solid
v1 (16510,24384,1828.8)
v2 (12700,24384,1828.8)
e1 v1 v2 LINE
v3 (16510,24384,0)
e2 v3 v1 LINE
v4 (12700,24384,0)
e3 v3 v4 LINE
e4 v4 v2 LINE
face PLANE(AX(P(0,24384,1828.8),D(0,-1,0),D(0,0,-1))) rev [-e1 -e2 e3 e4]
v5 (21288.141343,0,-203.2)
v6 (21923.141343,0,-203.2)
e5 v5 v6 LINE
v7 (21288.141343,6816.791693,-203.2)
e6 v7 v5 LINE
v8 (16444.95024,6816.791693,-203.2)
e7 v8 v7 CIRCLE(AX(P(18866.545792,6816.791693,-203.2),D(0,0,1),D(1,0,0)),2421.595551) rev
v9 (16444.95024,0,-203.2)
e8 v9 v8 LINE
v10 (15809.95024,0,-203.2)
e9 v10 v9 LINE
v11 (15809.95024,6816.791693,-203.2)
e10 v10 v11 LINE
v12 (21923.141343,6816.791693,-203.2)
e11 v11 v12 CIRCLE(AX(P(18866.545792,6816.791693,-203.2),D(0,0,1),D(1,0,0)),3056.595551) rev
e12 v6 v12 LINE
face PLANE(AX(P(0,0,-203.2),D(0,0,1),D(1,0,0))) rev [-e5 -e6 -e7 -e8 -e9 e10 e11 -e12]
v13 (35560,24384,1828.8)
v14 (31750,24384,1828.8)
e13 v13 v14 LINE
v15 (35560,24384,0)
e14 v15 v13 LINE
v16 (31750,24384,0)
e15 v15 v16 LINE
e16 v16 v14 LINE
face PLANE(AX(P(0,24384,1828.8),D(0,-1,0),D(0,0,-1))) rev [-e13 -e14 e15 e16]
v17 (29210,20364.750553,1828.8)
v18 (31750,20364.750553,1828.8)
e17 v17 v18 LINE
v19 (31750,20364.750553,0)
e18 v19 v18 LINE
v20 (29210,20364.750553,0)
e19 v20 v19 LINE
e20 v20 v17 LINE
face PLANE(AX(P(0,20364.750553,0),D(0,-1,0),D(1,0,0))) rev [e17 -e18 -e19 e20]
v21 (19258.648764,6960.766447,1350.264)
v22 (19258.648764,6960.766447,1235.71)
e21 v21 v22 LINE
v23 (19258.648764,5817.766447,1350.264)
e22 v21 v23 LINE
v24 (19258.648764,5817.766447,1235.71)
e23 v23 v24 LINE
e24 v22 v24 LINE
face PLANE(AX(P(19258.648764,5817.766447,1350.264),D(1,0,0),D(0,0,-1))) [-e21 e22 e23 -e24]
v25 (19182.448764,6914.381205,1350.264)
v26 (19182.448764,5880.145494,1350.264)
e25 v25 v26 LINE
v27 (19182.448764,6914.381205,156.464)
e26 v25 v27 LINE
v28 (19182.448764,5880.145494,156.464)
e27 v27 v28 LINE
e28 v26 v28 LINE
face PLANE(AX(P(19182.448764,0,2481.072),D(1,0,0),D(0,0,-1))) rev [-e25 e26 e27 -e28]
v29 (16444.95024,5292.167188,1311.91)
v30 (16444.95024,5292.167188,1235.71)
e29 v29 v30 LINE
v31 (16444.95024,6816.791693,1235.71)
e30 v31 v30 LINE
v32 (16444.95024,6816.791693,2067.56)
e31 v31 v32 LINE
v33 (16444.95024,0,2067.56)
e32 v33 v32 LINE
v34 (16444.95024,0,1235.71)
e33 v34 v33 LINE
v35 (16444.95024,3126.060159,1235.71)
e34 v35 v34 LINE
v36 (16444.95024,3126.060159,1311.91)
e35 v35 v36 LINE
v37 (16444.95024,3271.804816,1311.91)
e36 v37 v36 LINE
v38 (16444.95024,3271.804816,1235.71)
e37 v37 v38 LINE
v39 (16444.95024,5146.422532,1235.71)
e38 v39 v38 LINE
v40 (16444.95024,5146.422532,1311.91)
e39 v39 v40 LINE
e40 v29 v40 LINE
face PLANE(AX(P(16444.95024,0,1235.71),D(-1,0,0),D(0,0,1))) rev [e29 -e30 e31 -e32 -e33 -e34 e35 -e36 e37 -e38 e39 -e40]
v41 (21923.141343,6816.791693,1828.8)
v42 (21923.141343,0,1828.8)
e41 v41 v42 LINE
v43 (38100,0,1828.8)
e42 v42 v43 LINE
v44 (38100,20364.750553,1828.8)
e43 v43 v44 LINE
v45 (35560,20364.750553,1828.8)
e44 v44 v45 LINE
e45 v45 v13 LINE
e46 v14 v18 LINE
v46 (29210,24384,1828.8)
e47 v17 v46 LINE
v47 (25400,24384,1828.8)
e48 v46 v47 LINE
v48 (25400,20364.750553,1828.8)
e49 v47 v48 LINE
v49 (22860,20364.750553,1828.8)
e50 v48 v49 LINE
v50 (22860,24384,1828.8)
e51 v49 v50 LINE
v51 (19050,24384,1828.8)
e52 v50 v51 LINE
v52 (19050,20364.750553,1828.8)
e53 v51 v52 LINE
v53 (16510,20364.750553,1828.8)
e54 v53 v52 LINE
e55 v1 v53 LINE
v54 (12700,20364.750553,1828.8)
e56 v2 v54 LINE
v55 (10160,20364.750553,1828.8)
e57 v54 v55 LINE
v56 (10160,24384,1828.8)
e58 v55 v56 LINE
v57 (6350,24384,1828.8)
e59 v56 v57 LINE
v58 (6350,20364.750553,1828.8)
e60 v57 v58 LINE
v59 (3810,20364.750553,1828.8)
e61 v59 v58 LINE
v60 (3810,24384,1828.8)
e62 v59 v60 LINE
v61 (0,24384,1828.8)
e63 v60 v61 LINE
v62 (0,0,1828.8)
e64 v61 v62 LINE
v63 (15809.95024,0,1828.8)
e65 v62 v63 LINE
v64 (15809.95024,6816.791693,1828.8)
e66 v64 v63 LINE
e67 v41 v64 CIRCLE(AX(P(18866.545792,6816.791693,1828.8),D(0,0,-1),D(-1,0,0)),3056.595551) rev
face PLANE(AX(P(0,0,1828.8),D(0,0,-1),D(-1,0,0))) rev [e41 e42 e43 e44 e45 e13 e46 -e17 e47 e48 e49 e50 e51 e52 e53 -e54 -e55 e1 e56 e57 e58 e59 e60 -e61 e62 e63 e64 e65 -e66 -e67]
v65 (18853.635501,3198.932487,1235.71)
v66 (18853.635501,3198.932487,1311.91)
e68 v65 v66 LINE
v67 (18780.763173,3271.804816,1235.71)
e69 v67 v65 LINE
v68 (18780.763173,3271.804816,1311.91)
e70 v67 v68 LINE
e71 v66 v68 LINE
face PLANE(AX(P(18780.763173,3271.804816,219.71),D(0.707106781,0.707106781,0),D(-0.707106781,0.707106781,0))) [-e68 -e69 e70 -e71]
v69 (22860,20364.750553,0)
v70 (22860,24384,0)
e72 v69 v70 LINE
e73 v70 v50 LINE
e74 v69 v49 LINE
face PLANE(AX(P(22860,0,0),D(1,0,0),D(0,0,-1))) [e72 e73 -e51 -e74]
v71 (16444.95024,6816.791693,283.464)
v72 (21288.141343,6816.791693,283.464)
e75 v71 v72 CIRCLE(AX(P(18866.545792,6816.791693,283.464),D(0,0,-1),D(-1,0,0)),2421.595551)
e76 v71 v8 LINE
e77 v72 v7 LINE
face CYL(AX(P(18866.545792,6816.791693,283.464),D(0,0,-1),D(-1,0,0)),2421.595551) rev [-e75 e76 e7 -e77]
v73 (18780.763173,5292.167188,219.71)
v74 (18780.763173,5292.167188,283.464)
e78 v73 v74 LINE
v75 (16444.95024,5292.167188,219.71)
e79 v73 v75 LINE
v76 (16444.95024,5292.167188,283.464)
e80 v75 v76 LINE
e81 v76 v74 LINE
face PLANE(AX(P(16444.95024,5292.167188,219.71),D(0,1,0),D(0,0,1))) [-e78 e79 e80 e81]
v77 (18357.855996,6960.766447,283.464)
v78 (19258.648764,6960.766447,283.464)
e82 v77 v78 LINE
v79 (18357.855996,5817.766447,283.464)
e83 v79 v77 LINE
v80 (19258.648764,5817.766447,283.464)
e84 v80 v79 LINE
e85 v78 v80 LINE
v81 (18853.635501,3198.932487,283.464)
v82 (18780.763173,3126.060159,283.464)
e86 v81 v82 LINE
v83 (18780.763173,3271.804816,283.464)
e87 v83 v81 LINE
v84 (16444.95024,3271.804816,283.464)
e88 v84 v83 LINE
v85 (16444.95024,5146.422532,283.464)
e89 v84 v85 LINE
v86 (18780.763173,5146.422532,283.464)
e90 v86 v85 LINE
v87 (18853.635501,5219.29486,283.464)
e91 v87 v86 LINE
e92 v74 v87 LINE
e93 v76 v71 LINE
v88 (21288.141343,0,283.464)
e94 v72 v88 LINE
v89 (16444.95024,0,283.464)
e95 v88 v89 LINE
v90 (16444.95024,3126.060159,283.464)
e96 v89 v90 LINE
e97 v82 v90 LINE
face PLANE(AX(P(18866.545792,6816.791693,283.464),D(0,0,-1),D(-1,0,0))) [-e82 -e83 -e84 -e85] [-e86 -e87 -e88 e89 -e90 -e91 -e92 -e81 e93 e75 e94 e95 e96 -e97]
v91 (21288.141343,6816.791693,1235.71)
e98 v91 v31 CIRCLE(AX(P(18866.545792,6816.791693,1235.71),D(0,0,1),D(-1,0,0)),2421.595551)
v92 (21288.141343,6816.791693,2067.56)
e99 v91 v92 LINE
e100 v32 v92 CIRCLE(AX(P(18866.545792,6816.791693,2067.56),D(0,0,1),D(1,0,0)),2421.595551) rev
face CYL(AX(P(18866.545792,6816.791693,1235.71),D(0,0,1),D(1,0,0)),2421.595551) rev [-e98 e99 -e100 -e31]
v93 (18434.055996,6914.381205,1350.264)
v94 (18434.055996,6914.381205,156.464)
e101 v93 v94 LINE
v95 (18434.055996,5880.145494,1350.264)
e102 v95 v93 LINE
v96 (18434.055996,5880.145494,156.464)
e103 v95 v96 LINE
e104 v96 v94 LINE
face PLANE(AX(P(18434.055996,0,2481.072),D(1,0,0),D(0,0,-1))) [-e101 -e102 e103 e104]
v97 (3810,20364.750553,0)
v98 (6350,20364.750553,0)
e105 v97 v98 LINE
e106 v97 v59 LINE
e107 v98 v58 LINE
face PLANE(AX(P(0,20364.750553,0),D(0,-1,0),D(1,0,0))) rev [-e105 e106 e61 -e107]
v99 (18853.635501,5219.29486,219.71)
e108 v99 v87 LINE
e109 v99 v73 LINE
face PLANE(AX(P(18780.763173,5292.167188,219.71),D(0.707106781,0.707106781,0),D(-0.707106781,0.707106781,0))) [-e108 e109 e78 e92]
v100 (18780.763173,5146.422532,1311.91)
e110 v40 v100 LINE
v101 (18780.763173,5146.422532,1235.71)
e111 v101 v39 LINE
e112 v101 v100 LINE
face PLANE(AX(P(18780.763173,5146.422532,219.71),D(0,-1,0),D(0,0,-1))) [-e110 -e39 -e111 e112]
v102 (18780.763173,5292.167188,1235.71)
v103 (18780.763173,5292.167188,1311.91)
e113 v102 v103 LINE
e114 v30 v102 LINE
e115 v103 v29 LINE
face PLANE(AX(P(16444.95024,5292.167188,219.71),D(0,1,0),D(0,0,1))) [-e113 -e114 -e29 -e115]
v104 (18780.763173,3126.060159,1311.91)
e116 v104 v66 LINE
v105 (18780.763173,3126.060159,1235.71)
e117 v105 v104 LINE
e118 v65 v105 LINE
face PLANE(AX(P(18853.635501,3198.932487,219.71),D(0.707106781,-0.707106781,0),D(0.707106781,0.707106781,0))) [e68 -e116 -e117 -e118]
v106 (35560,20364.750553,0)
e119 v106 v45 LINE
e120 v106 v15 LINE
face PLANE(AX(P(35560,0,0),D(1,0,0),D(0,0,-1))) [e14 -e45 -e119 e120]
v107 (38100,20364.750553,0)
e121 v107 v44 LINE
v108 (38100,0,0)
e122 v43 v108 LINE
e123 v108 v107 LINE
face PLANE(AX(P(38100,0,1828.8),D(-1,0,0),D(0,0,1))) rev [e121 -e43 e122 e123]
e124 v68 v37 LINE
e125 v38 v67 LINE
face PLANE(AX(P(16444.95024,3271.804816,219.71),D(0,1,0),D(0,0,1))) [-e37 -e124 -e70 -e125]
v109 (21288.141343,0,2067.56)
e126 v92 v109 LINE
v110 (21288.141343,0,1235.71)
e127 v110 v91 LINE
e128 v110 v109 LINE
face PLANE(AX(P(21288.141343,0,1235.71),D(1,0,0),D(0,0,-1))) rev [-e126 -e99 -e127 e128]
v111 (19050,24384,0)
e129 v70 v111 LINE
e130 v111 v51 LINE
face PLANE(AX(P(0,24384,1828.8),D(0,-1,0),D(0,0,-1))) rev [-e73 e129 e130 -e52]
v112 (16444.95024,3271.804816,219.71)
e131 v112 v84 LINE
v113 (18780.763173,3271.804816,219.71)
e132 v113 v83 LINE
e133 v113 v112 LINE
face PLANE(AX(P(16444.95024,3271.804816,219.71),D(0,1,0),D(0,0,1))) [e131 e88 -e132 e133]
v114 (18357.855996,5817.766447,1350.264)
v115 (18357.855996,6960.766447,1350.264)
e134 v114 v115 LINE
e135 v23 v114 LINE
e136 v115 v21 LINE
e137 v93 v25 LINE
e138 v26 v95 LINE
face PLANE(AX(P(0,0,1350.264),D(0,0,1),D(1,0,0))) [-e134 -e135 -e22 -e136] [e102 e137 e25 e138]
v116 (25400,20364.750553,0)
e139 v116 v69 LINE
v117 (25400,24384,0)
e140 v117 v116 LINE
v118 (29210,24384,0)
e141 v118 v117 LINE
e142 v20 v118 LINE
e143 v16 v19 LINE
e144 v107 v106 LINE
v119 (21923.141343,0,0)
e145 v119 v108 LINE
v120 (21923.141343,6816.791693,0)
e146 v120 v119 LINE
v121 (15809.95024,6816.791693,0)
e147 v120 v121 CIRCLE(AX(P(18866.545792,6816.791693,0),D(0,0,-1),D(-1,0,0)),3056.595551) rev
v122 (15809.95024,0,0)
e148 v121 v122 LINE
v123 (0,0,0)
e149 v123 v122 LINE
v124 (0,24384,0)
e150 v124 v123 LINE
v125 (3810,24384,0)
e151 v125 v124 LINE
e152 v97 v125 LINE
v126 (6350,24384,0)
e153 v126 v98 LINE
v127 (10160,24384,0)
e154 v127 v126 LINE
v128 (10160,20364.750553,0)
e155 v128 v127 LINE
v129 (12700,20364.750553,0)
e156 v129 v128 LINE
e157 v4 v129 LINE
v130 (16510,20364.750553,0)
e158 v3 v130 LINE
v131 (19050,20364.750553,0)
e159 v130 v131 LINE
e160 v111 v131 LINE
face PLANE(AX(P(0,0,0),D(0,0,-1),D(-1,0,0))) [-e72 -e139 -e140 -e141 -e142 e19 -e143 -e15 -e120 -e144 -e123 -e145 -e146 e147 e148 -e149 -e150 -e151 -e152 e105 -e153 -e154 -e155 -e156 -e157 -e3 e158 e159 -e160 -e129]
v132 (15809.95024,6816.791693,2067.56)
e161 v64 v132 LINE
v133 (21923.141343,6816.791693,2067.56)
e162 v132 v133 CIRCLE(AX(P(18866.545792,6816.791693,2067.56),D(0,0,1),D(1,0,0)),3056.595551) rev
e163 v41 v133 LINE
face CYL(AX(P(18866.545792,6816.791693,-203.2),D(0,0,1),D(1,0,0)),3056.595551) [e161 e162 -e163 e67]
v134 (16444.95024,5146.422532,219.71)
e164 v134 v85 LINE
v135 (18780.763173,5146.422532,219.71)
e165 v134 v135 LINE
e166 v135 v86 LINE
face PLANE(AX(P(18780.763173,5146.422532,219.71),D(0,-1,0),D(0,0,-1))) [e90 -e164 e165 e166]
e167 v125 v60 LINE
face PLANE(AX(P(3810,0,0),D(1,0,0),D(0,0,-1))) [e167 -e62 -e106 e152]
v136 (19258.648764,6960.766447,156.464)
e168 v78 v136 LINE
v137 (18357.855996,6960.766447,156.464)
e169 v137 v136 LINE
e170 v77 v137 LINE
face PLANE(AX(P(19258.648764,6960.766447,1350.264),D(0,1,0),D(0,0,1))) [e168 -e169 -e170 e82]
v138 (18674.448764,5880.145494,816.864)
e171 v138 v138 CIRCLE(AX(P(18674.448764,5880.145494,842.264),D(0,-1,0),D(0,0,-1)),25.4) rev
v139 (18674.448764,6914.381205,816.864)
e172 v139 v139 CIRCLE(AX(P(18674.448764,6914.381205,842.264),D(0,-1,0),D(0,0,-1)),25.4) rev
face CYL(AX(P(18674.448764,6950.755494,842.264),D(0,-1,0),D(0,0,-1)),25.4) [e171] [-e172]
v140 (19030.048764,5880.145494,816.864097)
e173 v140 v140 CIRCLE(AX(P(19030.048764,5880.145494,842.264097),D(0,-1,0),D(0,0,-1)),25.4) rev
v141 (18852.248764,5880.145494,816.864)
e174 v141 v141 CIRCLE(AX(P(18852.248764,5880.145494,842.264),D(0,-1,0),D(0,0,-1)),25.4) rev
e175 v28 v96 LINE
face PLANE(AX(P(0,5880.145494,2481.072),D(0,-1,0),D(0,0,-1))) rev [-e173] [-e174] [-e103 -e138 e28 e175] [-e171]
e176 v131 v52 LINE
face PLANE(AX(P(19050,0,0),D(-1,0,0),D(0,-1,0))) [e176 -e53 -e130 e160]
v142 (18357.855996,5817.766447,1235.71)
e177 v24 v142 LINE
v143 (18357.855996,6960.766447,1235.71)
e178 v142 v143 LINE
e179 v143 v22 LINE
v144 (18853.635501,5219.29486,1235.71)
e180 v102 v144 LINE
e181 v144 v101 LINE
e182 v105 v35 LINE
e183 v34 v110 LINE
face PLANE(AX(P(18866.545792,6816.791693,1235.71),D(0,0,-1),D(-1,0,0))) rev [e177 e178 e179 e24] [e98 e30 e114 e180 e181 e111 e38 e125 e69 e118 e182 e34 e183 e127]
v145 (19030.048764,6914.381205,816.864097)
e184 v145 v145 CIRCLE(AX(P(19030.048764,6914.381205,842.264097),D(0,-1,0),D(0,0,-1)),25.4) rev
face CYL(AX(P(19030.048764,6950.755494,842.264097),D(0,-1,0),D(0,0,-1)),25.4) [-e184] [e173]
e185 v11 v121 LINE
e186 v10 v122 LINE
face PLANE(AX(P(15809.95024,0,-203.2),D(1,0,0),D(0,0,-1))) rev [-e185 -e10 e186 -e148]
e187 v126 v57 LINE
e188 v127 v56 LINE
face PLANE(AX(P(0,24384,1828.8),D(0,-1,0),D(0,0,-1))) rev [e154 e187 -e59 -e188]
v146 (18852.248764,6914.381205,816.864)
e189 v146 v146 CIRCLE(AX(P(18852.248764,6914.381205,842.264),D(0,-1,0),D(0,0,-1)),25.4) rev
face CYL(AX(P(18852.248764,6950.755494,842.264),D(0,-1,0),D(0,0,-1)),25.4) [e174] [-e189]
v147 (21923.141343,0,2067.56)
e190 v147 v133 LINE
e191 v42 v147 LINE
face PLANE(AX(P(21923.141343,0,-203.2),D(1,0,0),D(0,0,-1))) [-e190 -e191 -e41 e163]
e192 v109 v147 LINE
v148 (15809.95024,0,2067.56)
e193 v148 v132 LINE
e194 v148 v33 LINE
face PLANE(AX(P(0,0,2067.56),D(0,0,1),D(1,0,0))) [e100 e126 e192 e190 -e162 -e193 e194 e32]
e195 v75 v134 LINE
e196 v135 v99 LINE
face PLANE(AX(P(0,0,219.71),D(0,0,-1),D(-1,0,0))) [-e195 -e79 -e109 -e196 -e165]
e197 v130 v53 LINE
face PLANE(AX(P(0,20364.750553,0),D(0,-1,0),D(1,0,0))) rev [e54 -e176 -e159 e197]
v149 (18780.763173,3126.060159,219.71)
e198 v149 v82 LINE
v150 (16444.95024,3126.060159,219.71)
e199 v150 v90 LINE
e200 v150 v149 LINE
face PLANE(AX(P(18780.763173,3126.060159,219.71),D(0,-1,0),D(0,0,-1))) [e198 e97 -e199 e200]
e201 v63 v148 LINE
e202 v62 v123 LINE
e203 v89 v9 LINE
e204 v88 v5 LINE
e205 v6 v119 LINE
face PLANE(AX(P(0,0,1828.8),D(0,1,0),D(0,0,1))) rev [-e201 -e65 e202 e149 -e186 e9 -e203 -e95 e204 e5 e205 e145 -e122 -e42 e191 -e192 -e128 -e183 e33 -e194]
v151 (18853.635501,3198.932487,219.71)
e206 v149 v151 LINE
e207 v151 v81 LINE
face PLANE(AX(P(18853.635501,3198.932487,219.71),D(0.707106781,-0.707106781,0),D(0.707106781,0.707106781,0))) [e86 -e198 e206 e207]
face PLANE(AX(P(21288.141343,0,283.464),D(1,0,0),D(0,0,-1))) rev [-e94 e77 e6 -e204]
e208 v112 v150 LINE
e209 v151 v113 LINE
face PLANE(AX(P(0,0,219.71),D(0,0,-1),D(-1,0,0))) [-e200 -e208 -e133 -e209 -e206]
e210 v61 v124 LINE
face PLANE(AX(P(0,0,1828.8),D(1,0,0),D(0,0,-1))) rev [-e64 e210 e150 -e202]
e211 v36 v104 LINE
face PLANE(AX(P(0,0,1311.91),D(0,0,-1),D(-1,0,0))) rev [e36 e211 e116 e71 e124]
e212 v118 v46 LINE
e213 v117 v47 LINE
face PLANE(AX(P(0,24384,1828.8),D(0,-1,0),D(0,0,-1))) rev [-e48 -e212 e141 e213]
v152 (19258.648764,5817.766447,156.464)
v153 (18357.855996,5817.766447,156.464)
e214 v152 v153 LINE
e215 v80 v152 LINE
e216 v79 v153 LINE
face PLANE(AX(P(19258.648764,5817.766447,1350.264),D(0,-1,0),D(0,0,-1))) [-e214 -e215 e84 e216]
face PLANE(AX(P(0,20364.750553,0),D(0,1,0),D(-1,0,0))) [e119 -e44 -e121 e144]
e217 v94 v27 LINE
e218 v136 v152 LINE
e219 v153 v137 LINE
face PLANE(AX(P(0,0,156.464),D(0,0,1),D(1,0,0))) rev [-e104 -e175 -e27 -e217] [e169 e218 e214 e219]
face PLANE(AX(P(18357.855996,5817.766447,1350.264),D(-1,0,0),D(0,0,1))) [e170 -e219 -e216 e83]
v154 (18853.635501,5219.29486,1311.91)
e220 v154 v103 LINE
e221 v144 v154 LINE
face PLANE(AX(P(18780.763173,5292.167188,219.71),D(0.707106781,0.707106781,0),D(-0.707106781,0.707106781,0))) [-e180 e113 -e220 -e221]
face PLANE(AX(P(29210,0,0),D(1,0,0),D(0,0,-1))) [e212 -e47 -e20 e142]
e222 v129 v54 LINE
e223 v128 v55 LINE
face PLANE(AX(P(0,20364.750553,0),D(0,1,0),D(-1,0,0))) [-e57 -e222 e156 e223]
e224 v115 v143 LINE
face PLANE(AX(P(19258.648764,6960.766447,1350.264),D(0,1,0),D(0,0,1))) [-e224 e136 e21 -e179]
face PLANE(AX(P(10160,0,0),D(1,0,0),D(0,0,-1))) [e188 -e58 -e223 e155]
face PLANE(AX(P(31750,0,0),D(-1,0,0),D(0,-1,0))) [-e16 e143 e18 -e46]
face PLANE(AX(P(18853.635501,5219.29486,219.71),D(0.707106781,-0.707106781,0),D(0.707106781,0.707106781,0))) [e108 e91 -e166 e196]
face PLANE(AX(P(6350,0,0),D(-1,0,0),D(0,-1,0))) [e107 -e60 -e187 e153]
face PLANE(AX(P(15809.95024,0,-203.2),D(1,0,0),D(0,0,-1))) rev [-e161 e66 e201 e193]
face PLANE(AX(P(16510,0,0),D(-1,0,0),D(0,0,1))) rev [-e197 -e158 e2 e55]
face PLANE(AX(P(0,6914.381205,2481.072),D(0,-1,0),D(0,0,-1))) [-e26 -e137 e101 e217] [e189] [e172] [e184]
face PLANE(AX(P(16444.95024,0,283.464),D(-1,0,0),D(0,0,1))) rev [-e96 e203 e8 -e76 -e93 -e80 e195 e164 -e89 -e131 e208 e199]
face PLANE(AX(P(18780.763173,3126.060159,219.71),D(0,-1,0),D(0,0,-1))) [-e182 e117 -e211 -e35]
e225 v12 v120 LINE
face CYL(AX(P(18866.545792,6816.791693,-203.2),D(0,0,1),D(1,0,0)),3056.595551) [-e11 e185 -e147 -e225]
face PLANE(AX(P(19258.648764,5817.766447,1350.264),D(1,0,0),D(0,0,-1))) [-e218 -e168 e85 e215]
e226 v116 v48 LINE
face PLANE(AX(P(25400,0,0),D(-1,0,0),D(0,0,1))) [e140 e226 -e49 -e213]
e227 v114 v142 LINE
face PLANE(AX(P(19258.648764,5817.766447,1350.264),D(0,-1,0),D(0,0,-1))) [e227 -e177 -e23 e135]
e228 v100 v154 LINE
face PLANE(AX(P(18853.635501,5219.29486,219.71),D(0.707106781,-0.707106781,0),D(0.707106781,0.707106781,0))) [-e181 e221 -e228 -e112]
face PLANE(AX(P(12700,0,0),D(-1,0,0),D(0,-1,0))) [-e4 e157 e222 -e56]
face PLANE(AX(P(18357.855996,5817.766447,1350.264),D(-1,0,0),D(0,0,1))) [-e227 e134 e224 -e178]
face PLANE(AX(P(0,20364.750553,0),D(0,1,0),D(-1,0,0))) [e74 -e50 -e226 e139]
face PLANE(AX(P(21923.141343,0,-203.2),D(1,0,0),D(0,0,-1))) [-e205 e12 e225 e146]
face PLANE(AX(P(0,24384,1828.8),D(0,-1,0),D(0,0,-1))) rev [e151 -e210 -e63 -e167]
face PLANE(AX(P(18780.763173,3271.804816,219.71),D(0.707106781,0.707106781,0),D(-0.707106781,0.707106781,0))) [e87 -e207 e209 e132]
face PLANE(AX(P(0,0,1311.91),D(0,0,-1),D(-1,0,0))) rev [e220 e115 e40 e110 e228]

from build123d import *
from build123d.topology import SkipClean

# Parameters (mm, degrees)
SKETCH1_W                = 38100
SKETCH1_H                = 24384
BOSS_EXTRUDE1_DEPTH      = 1828.8
SKETCH2_W                = 2540
SKETCH2_H                = 4019.249447419
CUT_EXTRUDE2_DEPTH       = 1828.8
CUT_EXTRUDE7_DEPTH       = 283.464
CUT_EXTRUDE9_START       = -593.09
CUT_EXTRUDE9_DEPTH       = 593.09
SKETCH5_W                = 748.392768262
SKETCH5_H                = 1034.235711045
CUT_EXTRUDE10_DEPTH      = 2197.608
BOSS_EXTRUDE2_DEPTH      = 127
BOSS_EXTRUDE2_DEPTH_BACK = 1066.8
SKETCH8_W                = 900.792768262
SKETCH8_H                = 1143
SKETCH8_W_2              = 748.392768262
SKETCH8_H_2              = 1034.235711045
SKETCH9_R                = 25.4
BOSS_EXTRUDE3_DEPTH      = 1070.61
BOSS_EXTRUDE4_DEPTH      = 76.2
BOSS_EXTRUDE4_DEPTH_BACK = 1016
BOSS_EXTRUDE5_DEPTH      = 238.76
BOSS_EXTRUDE5_DEPTH_BACK = 2032


with BuildPart() as part:
    # Sketch1 → Boss-Extrude1 (new body)
    with BuildSketch(Plane.XY):
        with Locations((19050, 12192)):
            Rectangle(SKETCH1_W, SKETCH1_H)
    extrude(amount=BOSS_EXTRUDE1_DEPTH)

    # Sketch2 → Cut-Extrude2 (cut)
    with BuildSketch(Plane.XY.offset(1828.8)):
        with Locations((5080, 22374.37527629)):
            Rectangle(SKETCH2_W, SKETCH2_H)
        with Locations((11430, 22374.37527629)):
            Rectangle(SKETCH2_W, SKETCH2_H)
        with Locations((17780, 22374.37527629)):
            Rectangle(SKETCH2_W, SKETCH2_H)
        with Locations((24130, 22374.37527629)):
            Rectangle(SKETCH2_W, SKETCH2_H)
        with Locations((30480, 22374.37527629)):
            Rectangle(SKETCH2_W, SKETCH2_H)
        with Locations((36830, 22374.37527629)):
            Rectangle(SKETCH2_W, SKETCH2_H)
    extrude(amount=-CUT_EXTRUDE2_DEPTH, mode=Mode.SUBTRACT)

    # Sketch3 → Cut-Extrude7 (cut)
    with BuildSketch(Plane(origin=(0, 0, 0), x_dir=(-1, 0, 0), z_dir=(0, 0, -1))):
        with BuildLine():
            Line((-16444.950240223, 0), (-21288.141342907, 0))
            Line((-21288.141342907, 0), (-21288.141342907, 6816.791692855))
            ThreePointArc((-21288.141342907, 6816.791692855), (-18866.545791565, 9238.387244197), (-16444.950240223, 6816.791692855))
            Line((-16444.950240223, 6816.791692855), (-16444.950240223, 0))
        make_face()
    extrude(amount=-CUT_EXTRUDE7_DEPTH, mode=Mode.SUBTRACT)

    # Sketch6 → Cut-Extrude9 (cut)
    with BuildSketch(Plane.XY.offset(1828.8).offset(CUT_EXTRUDE9_START)):
        with BuildLine():
            Line((16444.950240223, 0), (21288.141342907, 0))
            Line((21288.141342907, 0), (21288.141342907, 6816.791692855))
            ThreePointArc((21288.141342907, 6816.791692855), (20578.87242721, 8529.1183285), (18866.545791565, 9238.387244197))
            ThreePointArc((18866.545791565, 9238.387244197), (17154.21915592, 8529.1183285), (16444.950240223, 6816.791692855))
            Line((16444.950240223, 6816.791692855), (16444.950240223, 0))
        make_face()
    extrude(amount=CUT_EXTRUDE9_DEPTH, mode=Mode.SUBTRACT)

    # Sketch5 → Cut-Extrude10 (cut)
    with BuildSketch(Plane(origin=(0, 0, 283.464), x_dir=(-1, 0, 0), z_dir=(0, 0, -1))):
        with Locations((-18808.252380156, 6397.263349082)):
            Rectangle(SKETCH5_W, SKETCH5_H)
    extrude(amount=-CUT_EXTRUDE10_DEPTH, mode=Mode.SUBTRACT)

    # Sketch8 → Boss-Extrude2 (add, two sides: drawn at the far end of the back side and taken through both)
    with BuildSketch(Plane(origin=(0, 0, 283.464), x_dir=(-1, 0, 0), z_dir=(0, 0, -1)).offset(-BOSS_EXTRUDE2_DEPTH_BACK)):
        with Locations((-18808.252380156, 6389.266447281)):
            Rectangle(SKETCH8_W, SKETCH8_H)
        with Locations((-18808.252380156, 6397.263349082)):
            Rectangle(SKETCH8_W_2, SKETCH8_H_2, mode=Mode.SUBTRACT)
    extrude(amount=BOSS_EXTRUDE2_DEPTH + BOSS_EXTRUDE2_DEPTH_BACK)

    # Sketch9 → Boss-Extrude3 (add)
    with BuildSketch(Plane(origin=(0, 5880.145493559, 0), x_dir=(1, 0, 0), z_dir=(0, 1, 0))):
        with Locations((18852.248764287, -842.264)):
            Circle(SKETCH9_R)
        with Locations((19030.048764287, -842.264096753)):
            Circle(SKETCH9_R)
        with Locations((18674.448764287, -842.264)):
            Circle(SKETCH9_R)
    extrude(amount=BOSS_EXTRUDE3_DEPTH)

    # Sketch10 → Boss-Extrude4 (add, two sides: drawn at the far end of the back side and taken through both)
    with BuildSketch(Plane.XY.offset(1235.71).offset(-BOSS_EXTRUDE4_DEPTH_BACK)):
        Polygon((16444.950240223, 5292.167188251), (18780.763172563, 5292.167188251), (18853.635500849, 5219.294859965), (18780.763172563, 5146.422531679), (16444.950240223, 5146.422531679), align=None)
        Polygon((16444.950240223, 3271.804815759), (18780.763172563, 3271.804815759), (18853.635500849, 3198.932487473), (18780.763172563, 3126.060159187), (16444.950240223, 3126.060159187), align=None)
    extrude(amount=BOSS_EXTRUDE4_DEPTH + BOSS_EXTRUDE4_DEPTH_BACK)

    # Sketch11 → Boss-Extrude5 (add, two sides: drawn at the far end of the back side and taken through both)
    with SkipClean():  # the faces are left unmerged after this step: merging them gives an invalid solid
        with BuildSketch(Plane.XY.offset(1828.8).offset(-BOSS_EXTRUDE5_DEPTH_BACK)):
            with BuildLine():
                Line((15809.950240223, 0), (16444.950240223, 0))
                Line((16444.950240223, 0), (16444.950240223, 6816.791692855))
                ThreePointArc((16444.950240223, 6816.791692855), (18866.545791565, 9238.387244197), (21288.141342907, 6816.791692855))
                Line((21288.141342907, 6816.791692855), (21288.141342907, 0))
                Line((21288.141342907, 0), (21923.141342907, 0))
                Line((21923.141342907, 0), (21923.141342907, 6816.791692855))
                ThreePointArc((21923.141342907, 6816.791692855), (18866.545791565, 9873.387244197), (15809.950240223, 6816.791692855))
                Line((15809.950240223, 6816.791692855), (15809.950240223, 0))
            make_face()
        extrude(amount=BOSS_EXTRUDE5_DEPTH + BOSS_EXTRUDE5_DEPTH_BACK)
    add(part.part.scale(1), mode=Mode.REPLACE)  # the faces are merged on a copy


solid = part.part
